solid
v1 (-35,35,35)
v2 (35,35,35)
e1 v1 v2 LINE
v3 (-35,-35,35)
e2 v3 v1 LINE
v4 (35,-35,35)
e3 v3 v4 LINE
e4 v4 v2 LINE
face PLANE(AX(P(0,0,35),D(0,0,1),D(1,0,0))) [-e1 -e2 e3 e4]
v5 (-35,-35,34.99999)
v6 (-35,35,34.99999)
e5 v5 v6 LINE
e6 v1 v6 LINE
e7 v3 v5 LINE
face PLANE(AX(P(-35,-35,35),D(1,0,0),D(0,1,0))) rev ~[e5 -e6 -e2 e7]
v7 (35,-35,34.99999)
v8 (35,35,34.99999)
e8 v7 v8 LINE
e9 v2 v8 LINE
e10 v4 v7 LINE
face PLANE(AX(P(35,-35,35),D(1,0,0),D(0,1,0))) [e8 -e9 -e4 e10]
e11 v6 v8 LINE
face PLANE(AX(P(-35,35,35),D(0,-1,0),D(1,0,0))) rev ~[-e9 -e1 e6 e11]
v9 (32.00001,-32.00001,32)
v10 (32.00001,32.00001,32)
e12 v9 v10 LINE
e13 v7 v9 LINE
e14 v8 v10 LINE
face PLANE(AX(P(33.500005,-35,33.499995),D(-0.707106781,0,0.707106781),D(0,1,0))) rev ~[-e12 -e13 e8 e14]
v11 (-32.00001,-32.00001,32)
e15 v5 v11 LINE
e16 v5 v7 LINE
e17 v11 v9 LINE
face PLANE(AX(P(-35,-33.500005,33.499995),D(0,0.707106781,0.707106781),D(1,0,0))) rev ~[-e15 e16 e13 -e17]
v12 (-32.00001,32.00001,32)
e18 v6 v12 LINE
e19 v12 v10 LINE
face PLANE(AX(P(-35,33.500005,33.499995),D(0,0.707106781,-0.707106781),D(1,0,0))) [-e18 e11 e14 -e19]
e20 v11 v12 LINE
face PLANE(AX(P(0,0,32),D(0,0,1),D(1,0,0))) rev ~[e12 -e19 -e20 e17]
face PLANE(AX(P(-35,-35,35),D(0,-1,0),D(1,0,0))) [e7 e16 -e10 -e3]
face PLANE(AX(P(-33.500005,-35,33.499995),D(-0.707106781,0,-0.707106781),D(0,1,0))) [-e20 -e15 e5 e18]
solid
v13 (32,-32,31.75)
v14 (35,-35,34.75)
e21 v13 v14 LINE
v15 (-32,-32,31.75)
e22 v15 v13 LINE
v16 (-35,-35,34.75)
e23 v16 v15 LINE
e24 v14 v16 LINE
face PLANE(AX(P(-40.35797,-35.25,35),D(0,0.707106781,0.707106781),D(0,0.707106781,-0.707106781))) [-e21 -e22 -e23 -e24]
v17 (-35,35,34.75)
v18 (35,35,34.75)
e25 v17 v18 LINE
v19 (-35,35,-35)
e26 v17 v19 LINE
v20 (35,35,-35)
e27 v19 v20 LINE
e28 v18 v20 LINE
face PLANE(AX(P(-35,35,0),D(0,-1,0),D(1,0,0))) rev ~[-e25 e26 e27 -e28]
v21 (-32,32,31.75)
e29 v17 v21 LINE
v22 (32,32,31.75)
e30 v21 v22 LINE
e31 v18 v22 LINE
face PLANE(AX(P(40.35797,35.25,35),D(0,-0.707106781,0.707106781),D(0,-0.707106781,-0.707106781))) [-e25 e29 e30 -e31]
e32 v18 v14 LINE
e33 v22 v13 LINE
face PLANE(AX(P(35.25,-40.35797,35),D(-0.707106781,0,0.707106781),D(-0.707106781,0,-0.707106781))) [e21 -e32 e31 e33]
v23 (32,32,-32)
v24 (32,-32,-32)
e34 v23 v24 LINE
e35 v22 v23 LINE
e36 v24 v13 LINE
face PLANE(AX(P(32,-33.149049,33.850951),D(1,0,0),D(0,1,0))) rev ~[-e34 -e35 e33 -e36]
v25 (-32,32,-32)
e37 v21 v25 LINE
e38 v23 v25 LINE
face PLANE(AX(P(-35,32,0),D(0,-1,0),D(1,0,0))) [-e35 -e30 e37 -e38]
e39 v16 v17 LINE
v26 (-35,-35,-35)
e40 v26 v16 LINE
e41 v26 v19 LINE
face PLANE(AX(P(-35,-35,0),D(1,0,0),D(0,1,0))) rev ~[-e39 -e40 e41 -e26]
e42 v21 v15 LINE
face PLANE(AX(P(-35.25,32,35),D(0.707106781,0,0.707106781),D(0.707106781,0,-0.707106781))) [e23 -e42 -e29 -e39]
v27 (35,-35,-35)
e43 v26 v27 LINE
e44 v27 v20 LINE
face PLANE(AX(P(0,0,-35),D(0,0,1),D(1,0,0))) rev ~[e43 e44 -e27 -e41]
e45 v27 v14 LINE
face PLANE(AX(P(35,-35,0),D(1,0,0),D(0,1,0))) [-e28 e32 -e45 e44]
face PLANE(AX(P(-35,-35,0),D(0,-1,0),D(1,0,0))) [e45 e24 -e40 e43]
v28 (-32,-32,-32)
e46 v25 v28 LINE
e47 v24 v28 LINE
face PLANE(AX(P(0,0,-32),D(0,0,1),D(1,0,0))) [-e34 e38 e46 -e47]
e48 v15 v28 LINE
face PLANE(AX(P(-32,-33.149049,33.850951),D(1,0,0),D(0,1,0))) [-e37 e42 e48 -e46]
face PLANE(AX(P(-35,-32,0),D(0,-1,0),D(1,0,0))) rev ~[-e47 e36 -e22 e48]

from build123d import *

# Parameters (mm, degrees)
F0_W         = 70
F0_H         = 70
F1_DEPTH     = 35
F2_T         = -3
F3_W         = 70
F3_H         = 70
F4_DEPTH     = 3
F5_SIZE      = 2.99999
F6_T1_DEPTH  = 64
F6_T3_DEPTH  = 64
F6_T9_DEPTH  = 72.3579697109
F6_T15_DEPTH = 72.3579697109
F6_T24_DEPTH = 72.3579697109
F6_T30_DEPTH = 72.3579697109
F6_T39_DEPTH = 72.3579697109
F6_T45_DEPTH = 72.3579697109
F6_T54_DEPTH = 72.3579697109
F6_T60_DEPTH = 72.3579697109


# Not quite as in the source:
# - a fillet or chamfer that OpenCascade refuses, or shapes differently, is made with other operations: its cross-section is extruded or revolved along the edge and cut away or added
# - a fillet or chamfer is up to 0.001 mm smaller than in the source, because OpenCascade refuses the exact size


with BuildPart() as f1:
    # F0 (on Top) → F1 (new body, symmetric)
    with BuildSketch(Plane.XY):
        Rectangle(F0_W, F0_H)
    extrude(amount=F1_DEPTH, both=True)

    # F2
    f2_openings = [f1.faces().sort_by_distance(p)[0] for p in [
        (0, 0, 35),
    ]]
    offset(amount=F2_T, openings=f2_openings)

    # F6: chamfer of 3.25 on 4 edges, made by hand

    # F6_s2 → F6_t1 (cut)
    with BuildSketch(Plane.YZ.offset(-32)):
        Polygon((-35.25, 35), (-32, 31.75), (-32, 35), align=None)
        Polygon((35.25, 35), (32, 31.75), (32, 35), align=None)
    extrude(amount=F6_T1_DEPTH, mode=Mode.SUBTRACT)

    # F6_s4 → F6_t3 (cut)
    with BuildSketch(Plane.XZ.offset(-32)):
        Polygon((-35.25, 35), (-32, 31.75), (-32, 35), align=None)
        Polygon((35.25, 35), (32, 31.75), (32, 35), align=None)
    extrude(amount=F6_T3_DEPTH, mode=Mode.SUBTRACT)


with BuildPart() as f4:
    # F3 (on face) → F4 (new body)
    with BuildSketch(Plane.XY.offset(35)):
        Rectangle(F3_W, F3_H)
    extrude(amount=-F4_DEPTH)

    # F5 (size 3 in the source; OpenCascade refuses exactly that, so slightly less here)
    f5_edges = [f4.edges().sort_by_distance(p)[0] for p in [
        (0, 35, 32),
        (-35, 0, 32),
        (0, -35, 32),
        (35, 0, 32),
    ]]
    chamfer(f5_edges, length=F5_SIZE)


with BuildPart() as f6_tool7:
    # F6_s8 → F6_t9 (new body)
    with BuildSketch(Plane.YZ.offset(-40.3579697109)):
        Polygon((-35.25, 35), (-32, 31.75), (-32, 35), align=None)
    extrude(amount=F6_T9_DEPTH)

    split(bisect_by=Plane.XZ.offset(35), keep=Keep.BOTTOM)

    split(bisect_by=Plane.YZ.offset(-35), keep=Keep.TOP)

    split(bisect_by=Plane.YZ.offset(-32), keep=Keep.BOTTOM)


with BuildPart() as f6_tool13:
    # F6_s14 → F6_t15 (new body)
    with BuildSketch(Plane.XZ.offset(-32)):
        Polygon((-35.25, 35), (-32, 31.75), (-32, 35), align=None)
    extrude(amount=F6_T15_DEPTH)

    split(bisect_by=Plane.XZ.offset(35), keep=Keep.BOTTOM)

    split(bisect_by=Plane.YZ.offset(-35), keep=Keep.TOP)

    split(bisect_by=Plane.XZ.offset(32), keep=Keep.TOP)


with BuildPart() as f6_tool7_1:
    add(f6_tool7.part)

    # F6_t19: intersect F6_tool13
    add(f6_tool13.part, mode=Mode.INTERSECT)


with BuildPart() as f1_1:
    add(f1.part)

    # F6_t5: cut F6_tool7
    add(f6_tool7_1.part, mode=Mode.SUBTRACT)


with BuildPart() as f6_tool22:
    # F6_s23 → F6_t24 (new body)
    with BuildSketch(Plane.YZ.offset(-32)):
        Polygon((-35.25, 35), (-32, 31.75), (-32, 35), align=None)
    extrude(amount=F6_T24_DEPTH)

    split(bisect_by=Plane.XZ.offset(35), keep=Keep.BOTTOM)

    split(bisect_by=Plane.YZ.offset(35), keep=Keep.BOTTOM)

    split(bisect_by=Plane.YZ.offset(32), keep=Keep.TOP)


with BuildPart() as f6_tool28:
    # F6_s29 → F6_t30 (new body)
    with BuildSketch(Plane.XZ.offset(40.3579697109)):
        Polygon((35.25, 35), (32, 31.75), (32, 35), align=None)
    extrude(amount=-F6_T30_DEPTH)

    split(bisect_by=Plane.XZ.offset(35), keep=Keep.BOTTOM)

    split(bisect_by=Plane.YZ.offset(35), keep=Keep.BOTTOM)

    split(bisect_by=Plane.XZ.offset(32), keep=Keep.TOP)


with BuildPart() as f6_tool22_1:
    add(f6_tool22.part)

    # F6_t34: intersect F6_tool28
    add(f6_tool28.part, mode=Mode.INTERSECT)


with BuildPart() as f1_2:
    add(f1_1.part)

    # F6_t20: cut F6_tool22
    add(f6_tool22_1.part, mode=Mode.SUBTRACT)


with BuildPart() as f6_tool37:
    # F6_s38 → F6_t39 (new body)
    with BuildSketch(Plane.XZ.offset(-40.3579697109)):
        Polygon((-35.25, 35), (-32, 31.75), (-32, 35), align=None)
    extrude(amount=F6_T39_DEPTH)

    split(bisect_by=Plane.YZ.offset(-35), keep=Keep.TOP)

    split(bisect_by=Plane.XZ.offset(-35), keep=Keep.TOP)

    split(bisect_by=Plane.XZ.offset(-32), keep=Keep.BOTTOM)


with BuildPart() as f6_tool43:
    # F6_s44 → F6_t45 (new body)
    with BuildSketch(Plane.YZ.offset(32)):
        Polygon((35.25, 35), (32, 31.75), (32, 35), align=None)
    extrude(amount=-F6_T45_DEPTH)

    split(bisect_by=Plane.YZ.offset(-35), keep=Keep.TOP)

    split(bisect_by=Plane.XZ.offset(-35), keep=Keep.TOP)

    split(bisect_by=Plane.YZ.offset(-32), keep=Keep.BOTTOM)


with BuildPart() as f6_tool37_1:
    add(f6_tool37.part)

    # F6_t49: intersect F6_tool43
    add(f6_tool43.part, mode=Mode.INTERSECT)


with BuildPart() as f1_3:
    add(f1_2.part)

    # F6_t35: cut F6_tool37
    add(f6_tool37_1.part, mode=Mode.SUBTRACT)


with BuildPart() as f6_tool52:
    # F6_s53 → F6_t54 (new body)
    with BuildSketch(Plane.YZ.offset(40.3579697109)):
        Polygon((35.25, 35), (32, 31.75), (32, 35), align=None)
    extrude(amount=-F6_T54_DEPTH)

    split(bisect_by=Plane.XZ.offset(-35), keep=Keep.TOP)

    split(bisect_by=Plane.YZ.offset(35), keep=Keep.BOTTOM)

    split(bisect_by=Plane.YZ.offset(32), keep=Keep.TOP)


with BuildPart() as f6_tool58:
    # F6_s59 → F6_t60 (new body)
    with BuildSketch(Plane.XZ.offset(32)):
        Polygon((35.25, 35), (32, 31.75), (32, 35), align=None)
    extrude(amount=-F6_T60_DEPTH)

    split(bisect_by=Plane.XZ.offset(-35), keep=Keep.TOP)

    split(bisect_by=Plane.YZ.offset(35), keep=Keep.BOTTOM)

    split(bisect_by=Plane.XZ.offset(-32), keep=Keep.BOTTOM)


with BuildPart() as f6_tool52_1:
    add(f6_tool52.part)

    # F6_t64: intersect F6_tool58
    add(f6_tool58.part, mode=Mode.INTERSECT)


with BuildPart() as f1_4:
    add(f1_3.part)

    # F6_t50: cut F6_tool52
    add(f6_tool52_1.part, mode=Mode.SUBTRACT)


solid = Compound([f4.part, f1_4.part])
